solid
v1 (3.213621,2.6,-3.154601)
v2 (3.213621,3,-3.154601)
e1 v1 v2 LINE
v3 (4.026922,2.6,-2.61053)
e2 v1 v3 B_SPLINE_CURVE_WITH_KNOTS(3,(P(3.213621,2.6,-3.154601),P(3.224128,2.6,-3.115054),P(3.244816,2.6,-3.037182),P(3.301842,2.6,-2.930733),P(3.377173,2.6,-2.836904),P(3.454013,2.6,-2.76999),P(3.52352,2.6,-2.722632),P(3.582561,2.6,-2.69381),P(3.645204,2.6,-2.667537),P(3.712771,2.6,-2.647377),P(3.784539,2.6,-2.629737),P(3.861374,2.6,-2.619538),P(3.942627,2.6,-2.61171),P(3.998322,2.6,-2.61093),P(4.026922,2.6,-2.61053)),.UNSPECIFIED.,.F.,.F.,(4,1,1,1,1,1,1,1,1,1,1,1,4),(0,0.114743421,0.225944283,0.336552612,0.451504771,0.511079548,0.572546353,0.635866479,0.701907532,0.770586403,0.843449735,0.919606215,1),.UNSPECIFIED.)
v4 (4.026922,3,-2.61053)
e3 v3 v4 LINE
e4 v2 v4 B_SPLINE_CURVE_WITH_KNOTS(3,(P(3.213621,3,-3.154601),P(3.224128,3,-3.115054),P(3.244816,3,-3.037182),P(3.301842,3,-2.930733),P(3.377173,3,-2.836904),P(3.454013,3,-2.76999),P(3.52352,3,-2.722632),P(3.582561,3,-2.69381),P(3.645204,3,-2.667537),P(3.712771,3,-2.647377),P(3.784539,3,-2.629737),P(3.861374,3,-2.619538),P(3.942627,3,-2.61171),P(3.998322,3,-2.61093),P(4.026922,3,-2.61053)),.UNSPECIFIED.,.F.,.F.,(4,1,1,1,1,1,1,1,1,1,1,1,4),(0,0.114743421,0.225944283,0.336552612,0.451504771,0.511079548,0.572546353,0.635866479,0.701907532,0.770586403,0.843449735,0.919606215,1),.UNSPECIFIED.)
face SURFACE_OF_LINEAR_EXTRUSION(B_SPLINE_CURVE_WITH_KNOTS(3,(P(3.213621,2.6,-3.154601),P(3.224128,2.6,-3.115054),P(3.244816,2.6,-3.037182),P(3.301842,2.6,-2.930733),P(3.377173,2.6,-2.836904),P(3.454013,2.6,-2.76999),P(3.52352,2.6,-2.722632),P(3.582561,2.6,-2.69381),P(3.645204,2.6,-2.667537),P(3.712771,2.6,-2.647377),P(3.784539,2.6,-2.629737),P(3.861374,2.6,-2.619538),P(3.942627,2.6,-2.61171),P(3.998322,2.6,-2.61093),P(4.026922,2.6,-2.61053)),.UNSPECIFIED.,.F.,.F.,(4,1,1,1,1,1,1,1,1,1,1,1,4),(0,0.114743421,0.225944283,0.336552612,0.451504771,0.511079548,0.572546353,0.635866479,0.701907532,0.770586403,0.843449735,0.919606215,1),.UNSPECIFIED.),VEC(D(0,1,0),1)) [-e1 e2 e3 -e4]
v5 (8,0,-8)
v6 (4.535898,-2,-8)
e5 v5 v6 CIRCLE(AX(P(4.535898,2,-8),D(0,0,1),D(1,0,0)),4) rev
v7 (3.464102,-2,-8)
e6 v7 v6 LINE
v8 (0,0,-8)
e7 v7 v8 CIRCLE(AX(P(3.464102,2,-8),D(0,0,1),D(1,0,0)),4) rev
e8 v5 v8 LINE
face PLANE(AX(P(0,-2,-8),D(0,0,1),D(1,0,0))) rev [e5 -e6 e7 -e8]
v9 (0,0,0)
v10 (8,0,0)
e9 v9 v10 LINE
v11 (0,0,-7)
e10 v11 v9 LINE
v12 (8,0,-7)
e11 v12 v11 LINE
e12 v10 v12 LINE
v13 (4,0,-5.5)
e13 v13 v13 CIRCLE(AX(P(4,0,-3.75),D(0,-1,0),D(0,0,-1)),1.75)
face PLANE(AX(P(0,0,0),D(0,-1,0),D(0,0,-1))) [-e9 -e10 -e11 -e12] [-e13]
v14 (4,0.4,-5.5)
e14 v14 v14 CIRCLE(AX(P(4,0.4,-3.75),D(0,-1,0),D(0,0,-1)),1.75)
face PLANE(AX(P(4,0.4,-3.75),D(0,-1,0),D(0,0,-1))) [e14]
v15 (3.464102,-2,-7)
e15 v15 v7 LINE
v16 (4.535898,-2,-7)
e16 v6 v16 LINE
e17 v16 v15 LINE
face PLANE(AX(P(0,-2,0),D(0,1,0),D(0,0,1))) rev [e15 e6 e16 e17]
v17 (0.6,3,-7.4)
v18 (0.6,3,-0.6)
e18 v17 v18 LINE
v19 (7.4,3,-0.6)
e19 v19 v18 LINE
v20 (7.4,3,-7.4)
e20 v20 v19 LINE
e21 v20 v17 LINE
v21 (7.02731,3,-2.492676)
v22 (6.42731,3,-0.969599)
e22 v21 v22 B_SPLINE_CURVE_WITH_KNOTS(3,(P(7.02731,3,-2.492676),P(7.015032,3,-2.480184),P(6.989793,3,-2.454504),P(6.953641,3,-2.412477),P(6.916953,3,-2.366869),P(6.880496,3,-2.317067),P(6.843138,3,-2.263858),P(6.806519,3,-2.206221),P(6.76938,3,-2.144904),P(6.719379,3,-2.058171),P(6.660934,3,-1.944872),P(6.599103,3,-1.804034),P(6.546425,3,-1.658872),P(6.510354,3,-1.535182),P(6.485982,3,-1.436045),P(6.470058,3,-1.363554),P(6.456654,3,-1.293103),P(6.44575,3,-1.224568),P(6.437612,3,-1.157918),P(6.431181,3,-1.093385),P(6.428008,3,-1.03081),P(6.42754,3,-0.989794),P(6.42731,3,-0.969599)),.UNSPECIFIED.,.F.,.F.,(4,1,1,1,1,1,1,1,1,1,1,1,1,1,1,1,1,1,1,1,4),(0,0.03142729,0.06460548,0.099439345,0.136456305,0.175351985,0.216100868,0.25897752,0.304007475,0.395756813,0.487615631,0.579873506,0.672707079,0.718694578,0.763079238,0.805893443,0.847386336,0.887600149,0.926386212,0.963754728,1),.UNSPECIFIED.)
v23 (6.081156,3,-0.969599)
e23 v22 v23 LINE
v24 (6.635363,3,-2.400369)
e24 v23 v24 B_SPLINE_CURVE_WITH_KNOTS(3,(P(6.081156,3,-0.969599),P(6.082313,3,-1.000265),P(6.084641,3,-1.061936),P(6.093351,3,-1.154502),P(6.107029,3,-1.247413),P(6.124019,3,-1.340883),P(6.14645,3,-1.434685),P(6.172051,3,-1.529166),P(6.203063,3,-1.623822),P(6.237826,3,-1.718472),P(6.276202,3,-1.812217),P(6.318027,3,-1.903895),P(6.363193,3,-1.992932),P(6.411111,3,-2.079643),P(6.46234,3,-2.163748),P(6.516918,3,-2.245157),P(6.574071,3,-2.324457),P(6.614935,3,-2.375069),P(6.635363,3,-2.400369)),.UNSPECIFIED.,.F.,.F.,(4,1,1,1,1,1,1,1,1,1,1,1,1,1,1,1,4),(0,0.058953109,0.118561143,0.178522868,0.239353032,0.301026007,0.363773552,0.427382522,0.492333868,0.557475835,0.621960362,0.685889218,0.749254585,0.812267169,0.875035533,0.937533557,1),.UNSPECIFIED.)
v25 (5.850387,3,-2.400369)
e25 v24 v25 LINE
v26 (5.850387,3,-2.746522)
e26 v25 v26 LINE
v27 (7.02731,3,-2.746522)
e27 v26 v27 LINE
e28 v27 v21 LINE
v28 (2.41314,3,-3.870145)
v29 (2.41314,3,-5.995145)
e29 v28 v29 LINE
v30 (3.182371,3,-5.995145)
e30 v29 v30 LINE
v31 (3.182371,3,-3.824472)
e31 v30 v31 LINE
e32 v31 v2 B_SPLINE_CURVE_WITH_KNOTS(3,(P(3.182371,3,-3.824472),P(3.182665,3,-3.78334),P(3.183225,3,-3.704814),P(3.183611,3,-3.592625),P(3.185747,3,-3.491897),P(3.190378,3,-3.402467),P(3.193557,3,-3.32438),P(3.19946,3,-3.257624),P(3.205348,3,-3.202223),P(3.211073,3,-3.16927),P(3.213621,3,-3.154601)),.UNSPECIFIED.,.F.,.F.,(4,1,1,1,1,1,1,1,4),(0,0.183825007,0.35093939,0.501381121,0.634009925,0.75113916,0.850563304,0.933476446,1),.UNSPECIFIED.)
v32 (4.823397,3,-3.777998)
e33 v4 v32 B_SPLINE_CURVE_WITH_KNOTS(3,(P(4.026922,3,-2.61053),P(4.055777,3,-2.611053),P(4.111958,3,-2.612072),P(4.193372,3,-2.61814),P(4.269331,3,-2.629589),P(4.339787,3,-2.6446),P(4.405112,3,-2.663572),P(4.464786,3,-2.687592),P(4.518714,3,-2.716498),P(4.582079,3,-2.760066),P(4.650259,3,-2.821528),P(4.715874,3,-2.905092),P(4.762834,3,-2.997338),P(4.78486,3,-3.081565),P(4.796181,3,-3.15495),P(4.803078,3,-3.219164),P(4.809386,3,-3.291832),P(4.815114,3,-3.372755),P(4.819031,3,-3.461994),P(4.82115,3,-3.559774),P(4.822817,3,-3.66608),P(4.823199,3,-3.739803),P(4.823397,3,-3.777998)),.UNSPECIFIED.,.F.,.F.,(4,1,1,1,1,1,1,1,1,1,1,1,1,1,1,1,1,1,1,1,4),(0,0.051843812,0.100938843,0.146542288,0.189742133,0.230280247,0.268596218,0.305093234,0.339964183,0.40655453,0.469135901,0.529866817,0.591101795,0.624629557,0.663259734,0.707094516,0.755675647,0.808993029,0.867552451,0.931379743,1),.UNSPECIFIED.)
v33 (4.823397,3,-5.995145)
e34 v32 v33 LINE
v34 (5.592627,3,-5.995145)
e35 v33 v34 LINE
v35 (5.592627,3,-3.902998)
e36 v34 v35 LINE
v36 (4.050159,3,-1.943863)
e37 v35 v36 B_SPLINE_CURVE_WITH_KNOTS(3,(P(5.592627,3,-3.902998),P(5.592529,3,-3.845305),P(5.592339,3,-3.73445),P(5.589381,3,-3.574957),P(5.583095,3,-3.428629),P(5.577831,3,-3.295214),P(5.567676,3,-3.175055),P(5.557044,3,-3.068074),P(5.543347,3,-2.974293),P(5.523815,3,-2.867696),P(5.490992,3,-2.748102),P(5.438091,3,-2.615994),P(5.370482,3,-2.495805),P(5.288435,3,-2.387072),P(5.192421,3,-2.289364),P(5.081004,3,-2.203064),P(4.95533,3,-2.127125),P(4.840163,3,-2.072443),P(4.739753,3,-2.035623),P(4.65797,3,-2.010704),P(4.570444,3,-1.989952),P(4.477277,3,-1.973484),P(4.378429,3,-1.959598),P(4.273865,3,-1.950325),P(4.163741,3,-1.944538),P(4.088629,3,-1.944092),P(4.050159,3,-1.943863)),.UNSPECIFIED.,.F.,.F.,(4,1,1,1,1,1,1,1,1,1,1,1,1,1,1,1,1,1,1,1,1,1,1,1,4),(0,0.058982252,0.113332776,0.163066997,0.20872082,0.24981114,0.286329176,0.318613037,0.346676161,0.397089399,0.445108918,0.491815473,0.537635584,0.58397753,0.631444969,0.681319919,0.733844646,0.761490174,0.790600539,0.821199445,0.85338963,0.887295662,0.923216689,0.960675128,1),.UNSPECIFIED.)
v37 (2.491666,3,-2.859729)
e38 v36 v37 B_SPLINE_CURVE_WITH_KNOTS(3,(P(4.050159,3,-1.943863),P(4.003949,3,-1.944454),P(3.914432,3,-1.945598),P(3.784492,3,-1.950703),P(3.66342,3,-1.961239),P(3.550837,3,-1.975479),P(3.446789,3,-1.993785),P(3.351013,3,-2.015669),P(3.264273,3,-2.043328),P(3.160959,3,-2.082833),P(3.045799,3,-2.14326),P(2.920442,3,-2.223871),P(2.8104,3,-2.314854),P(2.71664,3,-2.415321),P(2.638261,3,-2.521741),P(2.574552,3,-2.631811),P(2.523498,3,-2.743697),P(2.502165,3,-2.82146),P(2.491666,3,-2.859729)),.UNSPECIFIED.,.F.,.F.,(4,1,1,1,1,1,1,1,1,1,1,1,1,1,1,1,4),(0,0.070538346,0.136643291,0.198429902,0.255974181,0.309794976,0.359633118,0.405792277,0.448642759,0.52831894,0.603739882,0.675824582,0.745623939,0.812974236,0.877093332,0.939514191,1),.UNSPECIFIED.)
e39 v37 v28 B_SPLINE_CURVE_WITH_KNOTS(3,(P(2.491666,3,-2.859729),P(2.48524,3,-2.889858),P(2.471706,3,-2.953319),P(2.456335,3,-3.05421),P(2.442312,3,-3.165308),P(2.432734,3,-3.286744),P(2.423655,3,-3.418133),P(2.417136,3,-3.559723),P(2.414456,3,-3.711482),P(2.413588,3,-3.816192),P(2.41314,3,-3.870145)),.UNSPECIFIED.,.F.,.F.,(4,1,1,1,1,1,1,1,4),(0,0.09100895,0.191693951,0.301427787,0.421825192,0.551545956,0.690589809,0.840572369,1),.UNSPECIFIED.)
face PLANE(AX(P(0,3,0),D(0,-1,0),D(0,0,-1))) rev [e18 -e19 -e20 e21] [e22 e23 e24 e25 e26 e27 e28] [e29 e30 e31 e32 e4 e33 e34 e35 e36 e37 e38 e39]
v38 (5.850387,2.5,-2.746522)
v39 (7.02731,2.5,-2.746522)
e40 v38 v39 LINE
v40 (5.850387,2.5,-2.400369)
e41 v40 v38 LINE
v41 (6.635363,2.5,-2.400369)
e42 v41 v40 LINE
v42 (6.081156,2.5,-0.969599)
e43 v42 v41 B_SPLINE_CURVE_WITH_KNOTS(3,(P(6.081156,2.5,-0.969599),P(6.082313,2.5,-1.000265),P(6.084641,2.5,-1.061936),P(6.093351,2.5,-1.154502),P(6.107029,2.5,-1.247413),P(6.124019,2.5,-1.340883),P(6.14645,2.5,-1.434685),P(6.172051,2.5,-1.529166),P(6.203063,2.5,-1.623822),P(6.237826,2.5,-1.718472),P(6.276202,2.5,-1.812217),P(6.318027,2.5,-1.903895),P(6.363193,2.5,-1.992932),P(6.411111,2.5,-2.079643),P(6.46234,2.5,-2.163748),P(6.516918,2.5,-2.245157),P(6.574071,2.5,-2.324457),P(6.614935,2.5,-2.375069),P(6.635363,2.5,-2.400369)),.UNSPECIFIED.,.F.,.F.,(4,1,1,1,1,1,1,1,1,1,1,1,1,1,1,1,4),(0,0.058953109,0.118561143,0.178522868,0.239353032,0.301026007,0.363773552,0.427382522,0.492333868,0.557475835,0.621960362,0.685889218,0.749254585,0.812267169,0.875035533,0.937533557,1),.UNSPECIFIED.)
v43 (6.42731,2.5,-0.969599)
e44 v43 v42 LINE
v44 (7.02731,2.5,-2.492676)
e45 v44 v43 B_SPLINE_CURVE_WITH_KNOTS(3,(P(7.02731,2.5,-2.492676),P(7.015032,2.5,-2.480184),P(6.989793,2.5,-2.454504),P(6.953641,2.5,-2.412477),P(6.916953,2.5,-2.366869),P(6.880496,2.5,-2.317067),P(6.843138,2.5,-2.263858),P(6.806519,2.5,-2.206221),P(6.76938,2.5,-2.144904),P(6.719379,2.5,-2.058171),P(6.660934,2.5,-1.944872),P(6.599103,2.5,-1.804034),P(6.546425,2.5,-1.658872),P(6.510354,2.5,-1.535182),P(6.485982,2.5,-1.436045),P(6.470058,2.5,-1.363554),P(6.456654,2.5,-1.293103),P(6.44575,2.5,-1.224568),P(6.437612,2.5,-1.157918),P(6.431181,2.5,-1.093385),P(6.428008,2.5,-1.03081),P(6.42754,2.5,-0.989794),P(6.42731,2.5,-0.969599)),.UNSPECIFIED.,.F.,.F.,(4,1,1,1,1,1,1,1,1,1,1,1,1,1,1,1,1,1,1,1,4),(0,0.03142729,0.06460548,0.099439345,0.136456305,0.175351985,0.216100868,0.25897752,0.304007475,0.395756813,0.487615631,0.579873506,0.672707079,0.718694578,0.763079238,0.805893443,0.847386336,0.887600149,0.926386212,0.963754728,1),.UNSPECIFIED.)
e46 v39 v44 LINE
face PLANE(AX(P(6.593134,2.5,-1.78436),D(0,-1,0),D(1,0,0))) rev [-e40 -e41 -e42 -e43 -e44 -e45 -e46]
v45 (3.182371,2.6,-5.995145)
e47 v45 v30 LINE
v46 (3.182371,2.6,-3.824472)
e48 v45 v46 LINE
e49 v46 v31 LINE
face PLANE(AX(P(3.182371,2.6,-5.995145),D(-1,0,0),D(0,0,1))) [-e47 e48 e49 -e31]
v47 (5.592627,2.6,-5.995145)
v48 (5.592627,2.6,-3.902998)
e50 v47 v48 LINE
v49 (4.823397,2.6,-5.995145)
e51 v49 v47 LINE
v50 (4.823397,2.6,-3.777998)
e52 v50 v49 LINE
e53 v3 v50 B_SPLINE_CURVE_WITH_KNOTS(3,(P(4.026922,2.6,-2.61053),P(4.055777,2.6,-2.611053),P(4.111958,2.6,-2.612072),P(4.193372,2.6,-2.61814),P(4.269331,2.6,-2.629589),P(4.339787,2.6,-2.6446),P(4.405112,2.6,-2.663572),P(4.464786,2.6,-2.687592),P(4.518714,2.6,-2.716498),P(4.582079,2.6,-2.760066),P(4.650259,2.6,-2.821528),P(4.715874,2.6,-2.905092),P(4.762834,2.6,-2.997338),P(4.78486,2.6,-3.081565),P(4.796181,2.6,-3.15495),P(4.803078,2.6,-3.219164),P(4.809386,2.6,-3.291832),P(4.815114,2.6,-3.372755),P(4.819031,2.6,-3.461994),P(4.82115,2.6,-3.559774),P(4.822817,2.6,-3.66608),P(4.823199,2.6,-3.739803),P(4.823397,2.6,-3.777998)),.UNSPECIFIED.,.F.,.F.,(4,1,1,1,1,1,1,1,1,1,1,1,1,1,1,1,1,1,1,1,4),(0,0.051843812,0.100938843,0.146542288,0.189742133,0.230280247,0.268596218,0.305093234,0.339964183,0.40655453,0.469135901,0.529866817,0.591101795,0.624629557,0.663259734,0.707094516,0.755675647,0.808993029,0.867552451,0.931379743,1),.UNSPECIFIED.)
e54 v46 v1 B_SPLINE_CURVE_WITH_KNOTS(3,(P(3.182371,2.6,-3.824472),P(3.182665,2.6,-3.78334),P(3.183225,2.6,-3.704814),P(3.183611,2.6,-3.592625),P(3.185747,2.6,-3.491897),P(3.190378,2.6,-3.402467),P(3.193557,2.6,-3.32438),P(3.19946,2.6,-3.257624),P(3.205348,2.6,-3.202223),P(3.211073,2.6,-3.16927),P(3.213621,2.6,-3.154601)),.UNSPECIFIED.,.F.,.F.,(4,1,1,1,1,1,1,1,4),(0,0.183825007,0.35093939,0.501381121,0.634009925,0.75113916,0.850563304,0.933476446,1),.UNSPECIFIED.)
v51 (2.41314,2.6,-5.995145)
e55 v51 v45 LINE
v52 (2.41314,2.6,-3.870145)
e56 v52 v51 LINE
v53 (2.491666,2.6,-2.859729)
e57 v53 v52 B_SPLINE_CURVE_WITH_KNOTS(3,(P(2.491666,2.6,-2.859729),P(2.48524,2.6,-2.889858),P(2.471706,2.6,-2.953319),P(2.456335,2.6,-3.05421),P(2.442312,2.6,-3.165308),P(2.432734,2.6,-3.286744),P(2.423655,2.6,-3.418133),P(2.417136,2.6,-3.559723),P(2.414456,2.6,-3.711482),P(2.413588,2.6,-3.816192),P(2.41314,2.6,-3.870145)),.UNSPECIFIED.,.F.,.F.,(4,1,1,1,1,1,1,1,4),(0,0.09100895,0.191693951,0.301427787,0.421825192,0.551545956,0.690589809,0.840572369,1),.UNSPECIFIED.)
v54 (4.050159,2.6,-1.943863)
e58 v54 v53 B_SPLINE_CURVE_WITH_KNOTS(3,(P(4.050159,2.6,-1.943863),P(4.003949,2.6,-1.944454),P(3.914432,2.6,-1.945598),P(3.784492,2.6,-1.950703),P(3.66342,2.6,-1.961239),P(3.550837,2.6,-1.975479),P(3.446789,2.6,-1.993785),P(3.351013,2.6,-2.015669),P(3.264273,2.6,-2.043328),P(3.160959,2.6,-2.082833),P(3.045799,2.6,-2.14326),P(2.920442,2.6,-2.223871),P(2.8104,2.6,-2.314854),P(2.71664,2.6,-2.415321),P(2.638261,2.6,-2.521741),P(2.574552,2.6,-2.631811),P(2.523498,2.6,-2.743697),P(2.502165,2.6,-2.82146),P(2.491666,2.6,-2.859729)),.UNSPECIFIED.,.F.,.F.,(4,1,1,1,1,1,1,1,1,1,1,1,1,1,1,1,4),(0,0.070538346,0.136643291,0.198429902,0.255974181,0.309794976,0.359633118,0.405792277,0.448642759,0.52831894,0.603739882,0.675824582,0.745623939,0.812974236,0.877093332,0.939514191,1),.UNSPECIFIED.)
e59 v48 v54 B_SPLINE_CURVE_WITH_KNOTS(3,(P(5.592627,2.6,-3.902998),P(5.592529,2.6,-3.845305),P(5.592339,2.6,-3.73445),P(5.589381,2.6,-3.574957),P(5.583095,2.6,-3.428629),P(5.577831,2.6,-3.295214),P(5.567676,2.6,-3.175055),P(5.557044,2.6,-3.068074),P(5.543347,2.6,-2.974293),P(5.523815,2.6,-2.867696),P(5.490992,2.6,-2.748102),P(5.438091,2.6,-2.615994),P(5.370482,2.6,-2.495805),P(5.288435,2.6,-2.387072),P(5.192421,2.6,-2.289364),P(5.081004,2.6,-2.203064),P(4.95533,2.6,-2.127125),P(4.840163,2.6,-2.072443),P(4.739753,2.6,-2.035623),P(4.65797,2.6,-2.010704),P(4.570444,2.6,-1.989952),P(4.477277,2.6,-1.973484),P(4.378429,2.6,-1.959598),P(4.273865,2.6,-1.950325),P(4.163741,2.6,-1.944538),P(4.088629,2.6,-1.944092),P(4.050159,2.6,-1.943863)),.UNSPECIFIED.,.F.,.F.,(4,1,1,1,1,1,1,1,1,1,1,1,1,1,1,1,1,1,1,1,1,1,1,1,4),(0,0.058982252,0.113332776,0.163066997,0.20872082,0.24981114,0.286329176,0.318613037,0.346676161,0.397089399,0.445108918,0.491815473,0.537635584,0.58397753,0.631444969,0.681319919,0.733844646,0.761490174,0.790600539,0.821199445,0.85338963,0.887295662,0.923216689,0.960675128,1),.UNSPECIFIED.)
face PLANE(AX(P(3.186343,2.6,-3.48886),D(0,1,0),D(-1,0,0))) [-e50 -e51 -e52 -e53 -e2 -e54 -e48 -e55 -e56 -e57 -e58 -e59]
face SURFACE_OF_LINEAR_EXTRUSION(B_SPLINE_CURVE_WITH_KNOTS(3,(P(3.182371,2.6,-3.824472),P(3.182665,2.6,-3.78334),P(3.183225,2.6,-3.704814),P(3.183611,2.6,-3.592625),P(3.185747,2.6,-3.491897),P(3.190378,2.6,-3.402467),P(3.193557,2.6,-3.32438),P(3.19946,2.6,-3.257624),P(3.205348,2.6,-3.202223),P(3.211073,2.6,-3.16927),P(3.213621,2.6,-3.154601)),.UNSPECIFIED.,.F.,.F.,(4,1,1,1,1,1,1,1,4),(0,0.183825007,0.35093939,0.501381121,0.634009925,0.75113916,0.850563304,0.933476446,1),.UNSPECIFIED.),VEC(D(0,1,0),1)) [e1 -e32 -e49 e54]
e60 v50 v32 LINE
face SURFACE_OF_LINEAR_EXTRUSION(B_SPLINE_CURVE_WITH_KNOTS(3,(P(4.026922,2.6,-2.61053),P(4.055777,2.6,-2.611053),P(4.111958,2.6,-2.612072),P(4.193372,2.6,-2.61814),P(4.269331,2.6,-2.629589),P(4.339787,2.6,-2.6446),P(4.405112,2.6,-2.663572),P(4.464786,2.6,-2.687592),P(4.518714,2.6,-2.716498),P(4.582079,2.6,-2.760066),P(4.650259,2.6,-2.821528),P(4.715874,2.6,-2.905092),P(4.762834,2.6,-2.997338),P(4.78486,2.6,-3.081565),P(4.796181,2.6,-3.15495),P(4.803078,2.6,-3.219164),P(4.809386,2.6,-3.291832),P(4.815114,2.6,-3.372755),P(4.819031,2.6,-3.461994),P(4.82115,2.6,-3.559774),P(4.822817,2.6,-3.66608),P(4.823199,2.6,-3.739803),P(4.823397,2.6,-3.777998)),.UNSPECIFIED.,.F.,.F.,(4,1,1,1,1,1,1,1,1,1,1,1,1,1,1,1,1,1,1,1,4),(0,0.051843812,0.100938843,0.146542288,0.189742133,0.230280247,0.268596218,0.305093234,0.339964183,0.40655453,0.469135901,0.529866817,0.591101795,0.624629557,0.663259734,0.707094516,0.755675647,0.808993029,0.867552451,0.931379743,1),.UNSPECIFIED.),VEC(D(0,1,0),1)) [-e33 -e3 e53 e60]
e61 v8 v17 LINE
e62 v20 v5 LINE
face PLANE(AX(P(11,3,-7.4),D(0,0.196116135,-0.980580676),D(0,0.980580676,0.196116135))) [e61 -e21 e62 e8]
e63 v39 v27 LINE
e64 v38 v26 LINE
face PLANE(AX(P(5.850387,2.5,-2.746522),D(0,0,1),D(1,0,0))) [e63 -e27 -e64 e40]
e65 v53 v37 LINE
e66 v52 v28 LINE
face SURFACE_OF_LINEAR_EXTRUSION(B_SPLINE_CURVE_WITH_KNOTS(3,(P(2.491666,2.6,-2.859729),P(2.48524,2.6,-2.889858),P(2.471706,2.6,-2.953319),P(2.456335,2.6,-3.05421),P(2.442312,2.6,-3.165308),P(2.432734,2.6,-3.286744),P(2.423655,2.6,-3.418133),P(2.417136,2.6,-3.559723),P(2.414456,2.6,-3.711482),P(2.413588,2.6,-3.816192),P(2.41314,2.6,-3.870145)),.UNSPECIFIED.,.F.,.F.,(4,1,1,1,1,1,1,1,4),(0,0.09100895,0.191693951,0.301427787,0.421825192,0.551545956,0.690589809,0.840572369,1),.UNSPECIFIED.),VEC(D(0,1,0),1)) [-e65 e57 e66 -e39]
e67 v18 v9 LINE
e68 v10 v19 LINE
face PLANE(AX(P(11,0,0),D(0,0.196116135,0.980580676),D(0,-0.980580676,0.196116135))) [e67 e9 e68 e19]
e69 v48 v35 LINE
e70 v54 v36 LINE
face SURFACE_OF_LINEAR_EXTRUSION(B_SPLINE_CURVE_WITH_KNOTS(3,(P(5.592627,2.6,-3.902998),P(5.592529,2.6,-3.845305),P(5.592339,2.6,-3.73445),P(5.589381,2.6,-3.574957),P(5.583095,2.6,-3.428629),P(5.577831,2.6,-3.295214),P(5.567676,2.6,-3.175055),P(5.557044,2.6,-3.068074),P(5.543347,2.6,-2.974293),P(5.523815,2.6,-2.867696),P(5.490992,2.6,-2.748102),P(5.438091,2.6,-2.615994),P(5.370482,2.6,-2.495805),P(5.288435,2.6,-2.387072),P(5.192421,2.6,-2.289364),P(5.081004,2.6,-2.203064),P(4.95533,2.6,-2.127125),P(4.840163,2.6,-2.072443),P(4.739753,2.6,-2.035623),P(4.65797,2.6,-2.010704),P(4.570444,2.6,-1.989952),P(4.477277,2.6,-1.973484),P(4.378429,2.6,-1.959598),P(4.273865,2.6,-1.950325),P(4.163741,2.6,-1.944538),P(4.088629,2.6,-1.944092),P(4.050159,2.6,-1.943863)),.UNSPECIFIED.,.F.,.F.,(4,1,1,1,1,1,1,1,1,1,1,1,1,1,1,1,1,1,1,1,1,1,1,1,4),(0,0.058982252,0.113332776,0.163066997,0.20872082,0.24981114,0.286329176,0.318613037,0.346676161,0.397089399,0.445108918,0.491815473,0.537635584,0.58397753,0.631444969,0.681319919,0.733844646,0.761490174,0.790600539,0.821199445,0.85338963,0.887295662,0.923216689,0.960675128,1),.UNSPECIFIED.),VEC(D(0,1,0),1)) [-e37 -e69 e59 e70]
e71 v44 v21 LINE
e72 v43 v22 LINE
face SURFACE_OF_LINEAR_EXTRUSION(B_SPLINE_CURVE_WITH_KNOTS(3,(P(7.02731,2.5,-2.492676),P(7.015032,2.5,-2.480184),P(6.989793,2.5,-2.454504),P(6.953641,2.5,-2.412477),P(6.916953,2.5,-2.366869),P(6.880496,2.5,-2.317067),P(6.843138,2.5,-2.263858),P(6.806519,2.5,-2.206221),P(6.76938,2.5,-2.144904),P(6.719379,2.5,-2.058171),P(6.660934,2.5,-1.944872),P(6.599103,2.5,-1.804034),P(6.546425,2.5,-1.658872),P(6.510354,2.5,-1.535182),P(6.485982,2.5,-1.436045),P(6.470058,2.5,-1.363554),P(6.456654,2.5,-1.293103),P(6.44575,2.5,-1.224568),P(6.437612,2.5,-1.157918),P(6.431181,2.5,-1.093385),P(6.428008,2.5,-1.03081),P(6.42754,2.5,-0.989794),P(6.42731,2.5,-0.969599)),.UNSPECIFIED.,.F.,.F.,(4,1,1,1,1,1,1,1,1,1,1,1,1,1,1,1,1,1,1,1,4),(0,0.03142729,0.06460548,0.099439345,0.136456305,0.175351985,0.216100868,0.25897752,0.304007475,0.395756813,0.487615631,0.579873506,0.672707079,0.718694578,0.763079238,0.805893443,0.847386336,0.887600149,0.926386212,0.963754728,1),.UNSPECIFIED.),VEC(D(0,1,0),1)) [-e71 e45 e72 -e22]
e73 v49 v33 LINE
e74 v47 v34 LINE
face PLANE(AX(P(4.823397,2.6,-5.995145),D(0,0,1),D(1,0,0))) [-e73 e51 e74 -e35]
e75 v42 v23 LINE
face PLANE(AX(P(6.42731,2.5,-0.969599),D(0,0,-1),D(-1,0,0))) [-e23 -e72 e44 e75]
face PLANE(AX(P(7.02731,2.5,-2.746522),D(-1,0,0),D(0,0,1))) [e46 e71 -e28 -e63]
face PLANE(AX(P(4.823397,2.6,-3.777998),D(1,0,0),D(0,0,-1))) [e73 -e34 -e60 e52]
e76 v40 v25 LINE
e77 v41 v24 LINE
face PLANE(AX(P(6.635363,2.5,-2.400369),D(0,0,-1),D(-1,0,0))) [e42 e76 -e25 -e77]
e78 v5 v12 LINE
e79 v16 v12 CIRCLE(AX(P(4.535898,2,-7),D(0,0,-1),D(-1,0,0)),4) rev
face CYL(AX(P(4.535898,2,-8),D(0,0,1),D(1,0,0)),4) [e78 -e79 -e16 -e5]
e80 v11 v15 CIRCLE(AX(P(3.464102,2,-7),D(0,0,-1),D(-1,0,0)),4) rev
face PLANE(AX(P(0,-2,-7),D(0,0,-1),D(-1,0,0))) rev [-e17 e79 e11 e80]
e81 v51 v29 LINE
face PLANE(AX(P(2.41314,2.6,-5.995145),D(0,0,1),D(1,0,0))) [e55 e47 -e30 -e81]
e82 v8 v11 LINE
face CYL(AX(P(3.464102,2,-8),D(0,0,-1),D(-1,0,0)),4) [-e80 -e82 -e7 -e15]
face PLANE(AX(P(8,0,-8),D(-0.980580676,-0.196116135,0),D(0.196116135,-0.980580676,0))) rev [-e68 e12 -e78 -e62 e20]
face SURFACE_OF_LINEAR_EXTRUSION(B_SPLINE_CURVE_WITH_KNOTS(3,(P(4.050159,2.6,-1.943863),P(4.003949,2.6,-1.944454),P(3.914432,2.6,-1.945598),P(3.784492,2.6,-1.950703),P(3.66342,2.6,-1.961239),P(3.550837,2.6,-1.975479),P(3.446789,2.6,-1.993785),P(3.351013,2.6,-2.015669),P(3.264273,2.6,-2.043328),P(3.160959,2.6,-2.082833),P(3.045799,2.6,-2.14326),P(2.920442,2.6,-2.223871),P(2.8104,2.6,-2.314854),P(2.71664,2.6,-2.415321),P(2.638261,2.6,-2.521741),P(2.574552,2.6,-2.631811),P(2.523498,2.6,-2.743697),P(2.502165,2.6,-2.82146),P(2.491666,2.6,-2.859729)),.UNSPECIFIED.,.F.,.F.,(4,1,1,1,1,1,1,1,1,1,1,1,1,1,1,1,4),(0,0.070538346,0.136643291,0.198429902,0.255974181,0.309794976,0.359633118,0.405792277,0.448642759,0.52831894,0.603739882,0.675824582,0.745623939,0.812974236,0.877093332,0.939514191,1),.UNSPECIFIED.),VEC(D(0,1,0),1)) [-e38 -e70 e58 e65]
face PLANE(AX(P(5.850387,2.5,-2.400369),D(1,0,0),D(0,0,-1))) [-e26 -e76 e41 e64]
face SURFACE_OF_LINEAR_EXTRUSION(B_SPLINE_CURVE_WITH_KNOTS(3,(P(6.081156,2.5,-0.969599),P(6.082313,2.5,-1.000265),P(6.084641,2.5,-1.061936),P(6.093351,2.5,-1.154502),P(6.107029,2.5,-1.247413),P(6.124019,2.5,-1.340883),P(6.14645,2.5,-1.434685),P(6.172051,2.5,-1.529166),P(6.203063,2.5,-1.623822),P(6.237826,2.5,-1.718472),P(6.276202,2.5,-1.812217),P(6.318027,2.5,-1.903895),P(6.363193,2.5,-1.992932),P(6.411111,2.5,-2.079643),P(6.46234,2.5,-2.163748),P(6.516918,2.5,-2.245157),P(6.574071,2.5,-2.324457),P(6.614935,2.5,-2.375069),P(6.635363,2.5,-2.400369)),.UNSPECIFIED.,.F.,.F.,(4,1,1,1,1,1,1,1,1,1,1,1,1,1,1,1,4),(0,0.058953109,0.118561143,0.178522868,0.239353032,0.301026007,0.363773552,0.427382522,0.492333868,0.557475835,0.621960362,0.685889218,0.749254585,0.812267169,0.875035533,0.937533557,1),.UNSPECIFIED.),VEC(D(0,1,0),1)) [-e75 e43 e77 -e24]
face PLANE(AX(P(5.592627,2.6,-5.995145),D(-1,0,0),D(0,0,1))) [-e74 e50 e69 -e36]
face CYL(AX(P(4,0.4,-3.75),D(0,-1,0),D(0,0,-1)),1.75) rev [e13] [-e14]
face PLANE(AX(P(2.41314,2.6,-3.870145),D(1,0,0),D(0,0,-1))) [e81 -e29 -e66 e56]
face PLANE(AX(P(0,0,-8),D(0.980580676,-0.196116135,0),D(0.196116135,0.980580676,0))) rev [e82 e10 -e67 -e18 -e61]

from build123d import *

# Parameters (mm, degrees)
SKETCH1_W               = 8
SKETCH1_H               = 8
BOSS_EXTRUDE1_DEPTH     = 3
CUT_EXTRUDE1_DEPTH      = 12.704699911
CUT_EXTRUDE1_DEPTH_BACK = 12.704699911
CUT_EXTRUDE2_DEPTH      = 11
SKETCH4_R               = 1.75
CUT_EXTRUDE3_DEPTH      = 0.4
SKETCH5_W               = 8
SKETCH5_H               = 1
BOSS_EXTRUDE2_DEPTH     = 2
FILLET1_R               = 4
CUT_EXTRUDE4_DEPTH      = 0.4
CUT_EXTRUDE5_DEPTH      = 0.5


with BuildPart() as part:
    # Sketch1 → Boss-Extrude1 (new body)
    with BuildSketch(Plane(origin=(0, 0, 0), x_dir=(1, 0, 0), z_dir=(0, 1, 0))):
        with Locations((4, 4)):
            Rectangle(SKETCH1_W, SKETCH1_H)
    extrude(amount=BOSS_EXTRUDE1_DEPTH)

    # Sketch2 → Cut-Extrude1 (cut, two sides: drawn at the far end of the back side and taken through both)
    with BuildSketch(Plane.XY.offset(-CUT_EXTRUDE1_DEPTH_BACK)):
        Polygon((0, 0), (0.6, 3), (0, 3), align=None)
        Polygon((8, 0), (7.4, 3), (8, 3), align=None)
    extrude(amount=CUT_EXTRUDE1_DEPTH + CUT_EXTRUDE1_DEPTH_BACK, mode=Mode.SUBTRACT)

    # Sketch3 → Cut-Extrude2 (cut)
    with BuildSketch(Plane(origin=(0, 0, 0), x_dir=(0, 0, -1), z_dir=(1, 0, 0))):
        Polygon((0, 0), (0.6, 3), (0, 3), align=None)
        Polygon((8, 3), (7.4, 3), (8, 0), align=None)
    extrude(amount=CUT_EXTRUDE2_DEPTH, mode=Mode.SUBTRACT)

    # Sketch4 → Cut-Extrude3 (cut)
    with BuildSketch(Plane.XZ):
        with Locations(Location((4, -3.75, 0), (0, 0, 270))):
            Circle(SKETCH4_R)
    extrude(amount=-CUT_EXTRUDE3_DEPTH, mode=Mode.SUBTRACT)

    # Sketch5 → Boss-Extrude2 (add)
    with BuildSketch(Plane.XZ):
        with Locations((4, -7.5)):
            Rectangle(SKETCH5_W, SKETCH5_H)
    extrude(amount=BOSS_EXTRUDE2_DEPTH)

    # Fillet1
    # the kernel refuses this fillet: 4 mm, written as the material it takes off along each edge
    with BuildSketch(Plane(origin=(8, -2, -16.660254038), x_dir=(0, 1, 0), z_dir=(0, 0, 1)), Plane(origin=(0, -2, 1.660254038), x_dir=(0, 1, 0), z_dir=(0, 0, -1))) as fillet1_piece_1:
        with BuildLine():
            CenterArc((4, 3.464101615), FILLET1_R, 180, 60)
            Line((0, 3.464101615), (-0.08, 3.464101615))
            Line((-0.08, 3.464101615), (-0.08, 0))
            Line((-0.08, 0), (0, -0.08))
            ThreePointArc((0, -0.08), (1, -0.08), (1.96, -0.069282032))
            Line((1.96, -0.069282032), (2, 0))
        make_face()
    extrude(amount=18.320508076, mode=Mode.SUBTRACT)

    # Sketch6 → Cut-Extrude4 (cut)
    with BuildSketch(Plane(origin=(0, 3, 0), x_dir=(1, 0, 0), z_dir=(0, 1, 0))):
        with BuildLine():
            Line((2.413140262, 5.995145478), (3.182371031, 5.995145478))
            Line((3.182371031, 5.995145478), (3.182371031, 3.824472401))
            add(Edge.make_bspline(
                [(3.182371031, 3.824472401), (3.182664695, 3.783339968), (3.183225327, 3.704814249), (3.183611242, 3.59262518), (3.18574694, 3.491896749), (3.190378411, 3.402466647), (3.193557117, 3.32438048), (3.199459629, 3.257623918), (3.205347836, 3.202222959), (3.211072588, 3.16927001), (3.213621031, 3.154600607)],
                knots=[0, 0, 0, 0, 1.470600056, 2.807515117, 4.011048972, 5.072079398, 6.00911328, 6.804506435, 7.467811572, 8, 8, 8, 8], degree=3))
            add(Edge.make_bspline(
                [(3.213621031, 3.154600607), (3.224127628, 3.115054038), (3.244816443, 3.03718185), (3.301842427, 2.930732637), (3.377172946, 2.83690436), (3.454012852, 2.769989694), (3.523520467, 2.722632459), (3.582561491, 2.693810163), (3.645203631, 2.667536787), (3.712771176, 2.647377448), (3.784538951, 2.629737301), (3.861373833, 2.619537644), (3.942627383, 2.611709661), (3.998321517, 2.610930314), (4.026922313, 2.610530094)],
                knots=[0, 0, 0, 0, 1.376921055, 2.711331395, 4.038631339, 5.418057255, 6.132954575, 6.870556231, 7.630397752, 8.422890386, 9.247036838, 10.121396817, 11.035274583, 12, 12, 12, 12], degree=3))
            add(Edge.make_bspline(
                [(4.026922313, 2.610530094), (4.055777389, 2.611053435), (4.111957634, 2.612072369), (4.193372399, 2.618140476), (4.269330983, 2.629588903), (4.339786919, 2.644600001), (4.40511233, 2.663571514), (4.464786061, 2.687591678), (4.518714075, 2.716497769), (4.582078678, 2.760066391), (4.650258908, 2.821527538), (4.715873674, 2.905091818), (4.762833649, 2.997337694), (4.784859868, 3.081565077), (4.796180605, 3.154949811), (4.803077806, 3.219164001), (4.809385646, 3.291832182), (4.815113647, 3.372755319), (4.819030865, 3.461994153), (4.821149619, 3.559774375), (4.82281709, 3.666080391), (4.823198873, 3.739802878), (4.823396672, 3.777998042)],
                knots=[0, 0, 0, 0, 1.036876239, 2.018776863, 2.930845756, 3.794842666, 4.605604932, 5.371924355, 6.101864688, 6.799283669, 8.1310906, 9.382718023, 10.597336334, 11.822035891, 12.492591141, 13.265194674, 14.141890321, 15.11351293, 16.179860579, 17.351049011, 18.627594861, 20, 20, 20, 20], degree=3))
            Line((4.823396672, 3.777998042), (4.823396672, 5.995145478))
            Line((4.823396672, 5.995145478), (5.592627441, 5.995145478))
            Line((5.592627441, 5.995145478), (5.592627441, 3.902998042))
            add(Edge.make_bspline(
                [(5.592627441, 3.902998042), (5.592528847, 3.845305157), (5.592339402, 3.734449864), (5.589381475, 3.574956755), (5.583094941, 3.428628514), (5.577830511, 3.295214312), (5.567675642, 3.175054503), (5.557043529, 3.068074376), (5.543346947, 2.974292627), (5.523815493, 2.867696041), (5.490991615, 2.748101531), (5.438090809, 2.615994056), (5.370481989, 2.495804532), (5.288434562, 2.387071806), (5.192421188, 2.289363714), (5.081004269, 2.203064381), (4.955329501, 2.127124651), (4.84016309, 2.072443299), (4.739752735, 2.035622669), (4.65797018, 2.010704116), (4.570444093, 1.989952175), (4.477277128, 1.973483664), (4.378429252, 1.959598273), (4.273864574, 1.950325107), (4.163741291, 1.944537997), (4.088628699, 1.944091898), (4.050159493, 1.943863427)],
                knots=[0, 0, 0, 0, 1.415574045, 2.719986624, 3.913607924, 5.00929969, 5.995467356, 6.871900228, 7.64671288, 8.320227872, 9.530145585, 10.682614022, 11.803571353, 12.90325401, 14.015460715, 15.154679255, 16.351678057, 17.612271512, 18.275764165, 18.974412946, 19.708786676, 20.481351116, 21.295095879, 22.157200529, 23.056203067, 24, 24, 24, 24], degree=3))
            add(Edge.make_bspline(
                [(4.050159493, 1.943863427), (4.00394899, 1.944454117), (3.914432357, 1.945598373), (3.784491522, 1.950702797), (3.663419731, 1.961238523), (3.550836598, 1.975478544), (3.446788608, 1.993784557), (3.351012543, 2.015669281), (3.264273035, 2.043328483), (3.160959321, 2.082832512), (3.045798952, 2.143260432), (2.920442018, 2.223870786), (2.810400187, 2.314853884), (2.716640343, 2.415320705), (2.638260762, 2.521740618), (2.574552012, 2.631810814), (2.523497916, 2.743696672), (2.502164616, 2.821459533), (2.491665903, 2.859728812)],
                knots=[0, 0, 0, 0, 1.128613534, 2.186292659, 3.174878439, 4.095586888, 4.95671962, 5.754129884, 6.492676435, 7.178284149, 8.453103036, 9.659838108, 10.813193309, 11.929983019, 13.007587775, 14.033493319, 15.032227051, 16, 16, 16, 16], degree=3))
            add(Edge.make_bspline(
                [(2.491665903, 2.859728812), (2.48524032, 2.889857793), (2.471705989, 2.953319061), (2.456334745, 3.054210037), (2.442311642, 3.165307899), (2.432733679, 3.286744058), (2.423654648, 3.418133217), (2.417136225, 3.559723113), (2.414455843, 3.711481594), (2.413587623, 3.816192051), (2.413140262, 3.870145478)],
                knots=[0, 0, 0, 0, 0.728071598, 1.533551606, 2.411422299, 3.374601532, 4.412367648, 5.524718474, 6.72457895, 8, 8, 8, 8], degree=3))
            Line((2.413140262, 3.870145478), (2.413140262, 5.995145478))
        make_face()
    extrude(amount=-CUT_EXTRUDE4_DEPTH, mode=Mode.SUBTRACT)

    # Sketch7 → Cut-Extrude5 (cut)
    with BuildSketch(Plane(origin=(0, 3, 0), x_dir=(1, 0, 0), z_dir=(0, 1, 0))):
        with BuildLine():
            Line((5.850386773, 2.400368579), (5.850386773, 2.746522425))
            Line((5.850386773, 2.746522425), (7.02730985, 2.746522425))
            Line((7.02730985, 2.746522425), (7.02730985, 2.492676271))
            add(Edge.make_bspline(
                [(7.02730985, 2.492676271), (7.015032321, 2.480184286), (6.989793248, 2.454504354), (6.953640746, 2.41247659), (6.916952595, 2.366869092), (6.880495981, 2.317067299), (6.84313767, 2.263857918), (6.806519427, 2.206220957), (6.769380335, 2.144904141), (6.719379376, 2.058171383), (6.660934493, 1.944871602), (6.599102899, 1.804034186), (6.546425212, 1.658871525), (6.510353845, 1.535182236), (6.485981829, 1.436045461), (6.470058334, 1.363554301), (6.45665413, 1.293103137), (6.44574982, 1.224568153), (6.437611625, 1.157918082), (6.431181064, 1.093384645), (6.428008496, 1.030810475), (6.427540351, 0.989794441), (6.42730985, 0.969599348)],
                knots=[0, 0, 0, 0, 0.628545797, 1.29210959, 1.98878689, 2.729126096, 3.507039704, 4.322017351, 5.179550397, 6.080149501, 7.915136253, 9.752312618, 11.597470118, 13.454141581, 14.373891568, 15.261584755, 16.117868869, 16.947726723, 17.752002974, 18.527724242, 19.275094557, 20, 20, 20, 20], degree=3))
            Line((6.42730985, 0.969599348), (6.081156004, 0.969599348))
            add(Edge.make_bspline(
                [(6.081156004, 0.969599348), (6.082313464, 1.000264514), (6.084641243, 1.061935513), (6.093350513, 1.15450167), (6.107029358, 1.247412503), (6.124019401, 1.340882746), (6.146450494, 1.434684851), (6.172051243, 1.529166286), (6.203062702, 1.623822431), (6.237825714, 1.718472296), (6.276202253, 1.812217257), (6.31802728, 1.903894573), (6.363192674, 1.992932291), (6.411111069, 2.079643245), (6.462339924, 2.16374848), (6.516917811, 2.245156666), (6.574070556, 2.324456683), (6.614935451, 2.375068877), (6.635362734, 2.400368579)],
                knots=[0, 0, 0, 0, 0.943249748, 1.896978291, 2.856365892, 3.829648507, 4.816416106, 5.820376826, 6.838120354, 7.877341886, 8.919613352, 9.951365796, 10.974227495, 11.988073359, 12.996274698, 14.000568529, 15.000536908, 16, 16, 16, 16], degree=3))
            Line((6.635362734, 2.400368579), (5.850386773, 2.400368579))
        make_face()
    extrude(amount=-CUT_EXTRUDE5_DEPTH, mode=Mode.SUBTRACT)


solid = part.part
